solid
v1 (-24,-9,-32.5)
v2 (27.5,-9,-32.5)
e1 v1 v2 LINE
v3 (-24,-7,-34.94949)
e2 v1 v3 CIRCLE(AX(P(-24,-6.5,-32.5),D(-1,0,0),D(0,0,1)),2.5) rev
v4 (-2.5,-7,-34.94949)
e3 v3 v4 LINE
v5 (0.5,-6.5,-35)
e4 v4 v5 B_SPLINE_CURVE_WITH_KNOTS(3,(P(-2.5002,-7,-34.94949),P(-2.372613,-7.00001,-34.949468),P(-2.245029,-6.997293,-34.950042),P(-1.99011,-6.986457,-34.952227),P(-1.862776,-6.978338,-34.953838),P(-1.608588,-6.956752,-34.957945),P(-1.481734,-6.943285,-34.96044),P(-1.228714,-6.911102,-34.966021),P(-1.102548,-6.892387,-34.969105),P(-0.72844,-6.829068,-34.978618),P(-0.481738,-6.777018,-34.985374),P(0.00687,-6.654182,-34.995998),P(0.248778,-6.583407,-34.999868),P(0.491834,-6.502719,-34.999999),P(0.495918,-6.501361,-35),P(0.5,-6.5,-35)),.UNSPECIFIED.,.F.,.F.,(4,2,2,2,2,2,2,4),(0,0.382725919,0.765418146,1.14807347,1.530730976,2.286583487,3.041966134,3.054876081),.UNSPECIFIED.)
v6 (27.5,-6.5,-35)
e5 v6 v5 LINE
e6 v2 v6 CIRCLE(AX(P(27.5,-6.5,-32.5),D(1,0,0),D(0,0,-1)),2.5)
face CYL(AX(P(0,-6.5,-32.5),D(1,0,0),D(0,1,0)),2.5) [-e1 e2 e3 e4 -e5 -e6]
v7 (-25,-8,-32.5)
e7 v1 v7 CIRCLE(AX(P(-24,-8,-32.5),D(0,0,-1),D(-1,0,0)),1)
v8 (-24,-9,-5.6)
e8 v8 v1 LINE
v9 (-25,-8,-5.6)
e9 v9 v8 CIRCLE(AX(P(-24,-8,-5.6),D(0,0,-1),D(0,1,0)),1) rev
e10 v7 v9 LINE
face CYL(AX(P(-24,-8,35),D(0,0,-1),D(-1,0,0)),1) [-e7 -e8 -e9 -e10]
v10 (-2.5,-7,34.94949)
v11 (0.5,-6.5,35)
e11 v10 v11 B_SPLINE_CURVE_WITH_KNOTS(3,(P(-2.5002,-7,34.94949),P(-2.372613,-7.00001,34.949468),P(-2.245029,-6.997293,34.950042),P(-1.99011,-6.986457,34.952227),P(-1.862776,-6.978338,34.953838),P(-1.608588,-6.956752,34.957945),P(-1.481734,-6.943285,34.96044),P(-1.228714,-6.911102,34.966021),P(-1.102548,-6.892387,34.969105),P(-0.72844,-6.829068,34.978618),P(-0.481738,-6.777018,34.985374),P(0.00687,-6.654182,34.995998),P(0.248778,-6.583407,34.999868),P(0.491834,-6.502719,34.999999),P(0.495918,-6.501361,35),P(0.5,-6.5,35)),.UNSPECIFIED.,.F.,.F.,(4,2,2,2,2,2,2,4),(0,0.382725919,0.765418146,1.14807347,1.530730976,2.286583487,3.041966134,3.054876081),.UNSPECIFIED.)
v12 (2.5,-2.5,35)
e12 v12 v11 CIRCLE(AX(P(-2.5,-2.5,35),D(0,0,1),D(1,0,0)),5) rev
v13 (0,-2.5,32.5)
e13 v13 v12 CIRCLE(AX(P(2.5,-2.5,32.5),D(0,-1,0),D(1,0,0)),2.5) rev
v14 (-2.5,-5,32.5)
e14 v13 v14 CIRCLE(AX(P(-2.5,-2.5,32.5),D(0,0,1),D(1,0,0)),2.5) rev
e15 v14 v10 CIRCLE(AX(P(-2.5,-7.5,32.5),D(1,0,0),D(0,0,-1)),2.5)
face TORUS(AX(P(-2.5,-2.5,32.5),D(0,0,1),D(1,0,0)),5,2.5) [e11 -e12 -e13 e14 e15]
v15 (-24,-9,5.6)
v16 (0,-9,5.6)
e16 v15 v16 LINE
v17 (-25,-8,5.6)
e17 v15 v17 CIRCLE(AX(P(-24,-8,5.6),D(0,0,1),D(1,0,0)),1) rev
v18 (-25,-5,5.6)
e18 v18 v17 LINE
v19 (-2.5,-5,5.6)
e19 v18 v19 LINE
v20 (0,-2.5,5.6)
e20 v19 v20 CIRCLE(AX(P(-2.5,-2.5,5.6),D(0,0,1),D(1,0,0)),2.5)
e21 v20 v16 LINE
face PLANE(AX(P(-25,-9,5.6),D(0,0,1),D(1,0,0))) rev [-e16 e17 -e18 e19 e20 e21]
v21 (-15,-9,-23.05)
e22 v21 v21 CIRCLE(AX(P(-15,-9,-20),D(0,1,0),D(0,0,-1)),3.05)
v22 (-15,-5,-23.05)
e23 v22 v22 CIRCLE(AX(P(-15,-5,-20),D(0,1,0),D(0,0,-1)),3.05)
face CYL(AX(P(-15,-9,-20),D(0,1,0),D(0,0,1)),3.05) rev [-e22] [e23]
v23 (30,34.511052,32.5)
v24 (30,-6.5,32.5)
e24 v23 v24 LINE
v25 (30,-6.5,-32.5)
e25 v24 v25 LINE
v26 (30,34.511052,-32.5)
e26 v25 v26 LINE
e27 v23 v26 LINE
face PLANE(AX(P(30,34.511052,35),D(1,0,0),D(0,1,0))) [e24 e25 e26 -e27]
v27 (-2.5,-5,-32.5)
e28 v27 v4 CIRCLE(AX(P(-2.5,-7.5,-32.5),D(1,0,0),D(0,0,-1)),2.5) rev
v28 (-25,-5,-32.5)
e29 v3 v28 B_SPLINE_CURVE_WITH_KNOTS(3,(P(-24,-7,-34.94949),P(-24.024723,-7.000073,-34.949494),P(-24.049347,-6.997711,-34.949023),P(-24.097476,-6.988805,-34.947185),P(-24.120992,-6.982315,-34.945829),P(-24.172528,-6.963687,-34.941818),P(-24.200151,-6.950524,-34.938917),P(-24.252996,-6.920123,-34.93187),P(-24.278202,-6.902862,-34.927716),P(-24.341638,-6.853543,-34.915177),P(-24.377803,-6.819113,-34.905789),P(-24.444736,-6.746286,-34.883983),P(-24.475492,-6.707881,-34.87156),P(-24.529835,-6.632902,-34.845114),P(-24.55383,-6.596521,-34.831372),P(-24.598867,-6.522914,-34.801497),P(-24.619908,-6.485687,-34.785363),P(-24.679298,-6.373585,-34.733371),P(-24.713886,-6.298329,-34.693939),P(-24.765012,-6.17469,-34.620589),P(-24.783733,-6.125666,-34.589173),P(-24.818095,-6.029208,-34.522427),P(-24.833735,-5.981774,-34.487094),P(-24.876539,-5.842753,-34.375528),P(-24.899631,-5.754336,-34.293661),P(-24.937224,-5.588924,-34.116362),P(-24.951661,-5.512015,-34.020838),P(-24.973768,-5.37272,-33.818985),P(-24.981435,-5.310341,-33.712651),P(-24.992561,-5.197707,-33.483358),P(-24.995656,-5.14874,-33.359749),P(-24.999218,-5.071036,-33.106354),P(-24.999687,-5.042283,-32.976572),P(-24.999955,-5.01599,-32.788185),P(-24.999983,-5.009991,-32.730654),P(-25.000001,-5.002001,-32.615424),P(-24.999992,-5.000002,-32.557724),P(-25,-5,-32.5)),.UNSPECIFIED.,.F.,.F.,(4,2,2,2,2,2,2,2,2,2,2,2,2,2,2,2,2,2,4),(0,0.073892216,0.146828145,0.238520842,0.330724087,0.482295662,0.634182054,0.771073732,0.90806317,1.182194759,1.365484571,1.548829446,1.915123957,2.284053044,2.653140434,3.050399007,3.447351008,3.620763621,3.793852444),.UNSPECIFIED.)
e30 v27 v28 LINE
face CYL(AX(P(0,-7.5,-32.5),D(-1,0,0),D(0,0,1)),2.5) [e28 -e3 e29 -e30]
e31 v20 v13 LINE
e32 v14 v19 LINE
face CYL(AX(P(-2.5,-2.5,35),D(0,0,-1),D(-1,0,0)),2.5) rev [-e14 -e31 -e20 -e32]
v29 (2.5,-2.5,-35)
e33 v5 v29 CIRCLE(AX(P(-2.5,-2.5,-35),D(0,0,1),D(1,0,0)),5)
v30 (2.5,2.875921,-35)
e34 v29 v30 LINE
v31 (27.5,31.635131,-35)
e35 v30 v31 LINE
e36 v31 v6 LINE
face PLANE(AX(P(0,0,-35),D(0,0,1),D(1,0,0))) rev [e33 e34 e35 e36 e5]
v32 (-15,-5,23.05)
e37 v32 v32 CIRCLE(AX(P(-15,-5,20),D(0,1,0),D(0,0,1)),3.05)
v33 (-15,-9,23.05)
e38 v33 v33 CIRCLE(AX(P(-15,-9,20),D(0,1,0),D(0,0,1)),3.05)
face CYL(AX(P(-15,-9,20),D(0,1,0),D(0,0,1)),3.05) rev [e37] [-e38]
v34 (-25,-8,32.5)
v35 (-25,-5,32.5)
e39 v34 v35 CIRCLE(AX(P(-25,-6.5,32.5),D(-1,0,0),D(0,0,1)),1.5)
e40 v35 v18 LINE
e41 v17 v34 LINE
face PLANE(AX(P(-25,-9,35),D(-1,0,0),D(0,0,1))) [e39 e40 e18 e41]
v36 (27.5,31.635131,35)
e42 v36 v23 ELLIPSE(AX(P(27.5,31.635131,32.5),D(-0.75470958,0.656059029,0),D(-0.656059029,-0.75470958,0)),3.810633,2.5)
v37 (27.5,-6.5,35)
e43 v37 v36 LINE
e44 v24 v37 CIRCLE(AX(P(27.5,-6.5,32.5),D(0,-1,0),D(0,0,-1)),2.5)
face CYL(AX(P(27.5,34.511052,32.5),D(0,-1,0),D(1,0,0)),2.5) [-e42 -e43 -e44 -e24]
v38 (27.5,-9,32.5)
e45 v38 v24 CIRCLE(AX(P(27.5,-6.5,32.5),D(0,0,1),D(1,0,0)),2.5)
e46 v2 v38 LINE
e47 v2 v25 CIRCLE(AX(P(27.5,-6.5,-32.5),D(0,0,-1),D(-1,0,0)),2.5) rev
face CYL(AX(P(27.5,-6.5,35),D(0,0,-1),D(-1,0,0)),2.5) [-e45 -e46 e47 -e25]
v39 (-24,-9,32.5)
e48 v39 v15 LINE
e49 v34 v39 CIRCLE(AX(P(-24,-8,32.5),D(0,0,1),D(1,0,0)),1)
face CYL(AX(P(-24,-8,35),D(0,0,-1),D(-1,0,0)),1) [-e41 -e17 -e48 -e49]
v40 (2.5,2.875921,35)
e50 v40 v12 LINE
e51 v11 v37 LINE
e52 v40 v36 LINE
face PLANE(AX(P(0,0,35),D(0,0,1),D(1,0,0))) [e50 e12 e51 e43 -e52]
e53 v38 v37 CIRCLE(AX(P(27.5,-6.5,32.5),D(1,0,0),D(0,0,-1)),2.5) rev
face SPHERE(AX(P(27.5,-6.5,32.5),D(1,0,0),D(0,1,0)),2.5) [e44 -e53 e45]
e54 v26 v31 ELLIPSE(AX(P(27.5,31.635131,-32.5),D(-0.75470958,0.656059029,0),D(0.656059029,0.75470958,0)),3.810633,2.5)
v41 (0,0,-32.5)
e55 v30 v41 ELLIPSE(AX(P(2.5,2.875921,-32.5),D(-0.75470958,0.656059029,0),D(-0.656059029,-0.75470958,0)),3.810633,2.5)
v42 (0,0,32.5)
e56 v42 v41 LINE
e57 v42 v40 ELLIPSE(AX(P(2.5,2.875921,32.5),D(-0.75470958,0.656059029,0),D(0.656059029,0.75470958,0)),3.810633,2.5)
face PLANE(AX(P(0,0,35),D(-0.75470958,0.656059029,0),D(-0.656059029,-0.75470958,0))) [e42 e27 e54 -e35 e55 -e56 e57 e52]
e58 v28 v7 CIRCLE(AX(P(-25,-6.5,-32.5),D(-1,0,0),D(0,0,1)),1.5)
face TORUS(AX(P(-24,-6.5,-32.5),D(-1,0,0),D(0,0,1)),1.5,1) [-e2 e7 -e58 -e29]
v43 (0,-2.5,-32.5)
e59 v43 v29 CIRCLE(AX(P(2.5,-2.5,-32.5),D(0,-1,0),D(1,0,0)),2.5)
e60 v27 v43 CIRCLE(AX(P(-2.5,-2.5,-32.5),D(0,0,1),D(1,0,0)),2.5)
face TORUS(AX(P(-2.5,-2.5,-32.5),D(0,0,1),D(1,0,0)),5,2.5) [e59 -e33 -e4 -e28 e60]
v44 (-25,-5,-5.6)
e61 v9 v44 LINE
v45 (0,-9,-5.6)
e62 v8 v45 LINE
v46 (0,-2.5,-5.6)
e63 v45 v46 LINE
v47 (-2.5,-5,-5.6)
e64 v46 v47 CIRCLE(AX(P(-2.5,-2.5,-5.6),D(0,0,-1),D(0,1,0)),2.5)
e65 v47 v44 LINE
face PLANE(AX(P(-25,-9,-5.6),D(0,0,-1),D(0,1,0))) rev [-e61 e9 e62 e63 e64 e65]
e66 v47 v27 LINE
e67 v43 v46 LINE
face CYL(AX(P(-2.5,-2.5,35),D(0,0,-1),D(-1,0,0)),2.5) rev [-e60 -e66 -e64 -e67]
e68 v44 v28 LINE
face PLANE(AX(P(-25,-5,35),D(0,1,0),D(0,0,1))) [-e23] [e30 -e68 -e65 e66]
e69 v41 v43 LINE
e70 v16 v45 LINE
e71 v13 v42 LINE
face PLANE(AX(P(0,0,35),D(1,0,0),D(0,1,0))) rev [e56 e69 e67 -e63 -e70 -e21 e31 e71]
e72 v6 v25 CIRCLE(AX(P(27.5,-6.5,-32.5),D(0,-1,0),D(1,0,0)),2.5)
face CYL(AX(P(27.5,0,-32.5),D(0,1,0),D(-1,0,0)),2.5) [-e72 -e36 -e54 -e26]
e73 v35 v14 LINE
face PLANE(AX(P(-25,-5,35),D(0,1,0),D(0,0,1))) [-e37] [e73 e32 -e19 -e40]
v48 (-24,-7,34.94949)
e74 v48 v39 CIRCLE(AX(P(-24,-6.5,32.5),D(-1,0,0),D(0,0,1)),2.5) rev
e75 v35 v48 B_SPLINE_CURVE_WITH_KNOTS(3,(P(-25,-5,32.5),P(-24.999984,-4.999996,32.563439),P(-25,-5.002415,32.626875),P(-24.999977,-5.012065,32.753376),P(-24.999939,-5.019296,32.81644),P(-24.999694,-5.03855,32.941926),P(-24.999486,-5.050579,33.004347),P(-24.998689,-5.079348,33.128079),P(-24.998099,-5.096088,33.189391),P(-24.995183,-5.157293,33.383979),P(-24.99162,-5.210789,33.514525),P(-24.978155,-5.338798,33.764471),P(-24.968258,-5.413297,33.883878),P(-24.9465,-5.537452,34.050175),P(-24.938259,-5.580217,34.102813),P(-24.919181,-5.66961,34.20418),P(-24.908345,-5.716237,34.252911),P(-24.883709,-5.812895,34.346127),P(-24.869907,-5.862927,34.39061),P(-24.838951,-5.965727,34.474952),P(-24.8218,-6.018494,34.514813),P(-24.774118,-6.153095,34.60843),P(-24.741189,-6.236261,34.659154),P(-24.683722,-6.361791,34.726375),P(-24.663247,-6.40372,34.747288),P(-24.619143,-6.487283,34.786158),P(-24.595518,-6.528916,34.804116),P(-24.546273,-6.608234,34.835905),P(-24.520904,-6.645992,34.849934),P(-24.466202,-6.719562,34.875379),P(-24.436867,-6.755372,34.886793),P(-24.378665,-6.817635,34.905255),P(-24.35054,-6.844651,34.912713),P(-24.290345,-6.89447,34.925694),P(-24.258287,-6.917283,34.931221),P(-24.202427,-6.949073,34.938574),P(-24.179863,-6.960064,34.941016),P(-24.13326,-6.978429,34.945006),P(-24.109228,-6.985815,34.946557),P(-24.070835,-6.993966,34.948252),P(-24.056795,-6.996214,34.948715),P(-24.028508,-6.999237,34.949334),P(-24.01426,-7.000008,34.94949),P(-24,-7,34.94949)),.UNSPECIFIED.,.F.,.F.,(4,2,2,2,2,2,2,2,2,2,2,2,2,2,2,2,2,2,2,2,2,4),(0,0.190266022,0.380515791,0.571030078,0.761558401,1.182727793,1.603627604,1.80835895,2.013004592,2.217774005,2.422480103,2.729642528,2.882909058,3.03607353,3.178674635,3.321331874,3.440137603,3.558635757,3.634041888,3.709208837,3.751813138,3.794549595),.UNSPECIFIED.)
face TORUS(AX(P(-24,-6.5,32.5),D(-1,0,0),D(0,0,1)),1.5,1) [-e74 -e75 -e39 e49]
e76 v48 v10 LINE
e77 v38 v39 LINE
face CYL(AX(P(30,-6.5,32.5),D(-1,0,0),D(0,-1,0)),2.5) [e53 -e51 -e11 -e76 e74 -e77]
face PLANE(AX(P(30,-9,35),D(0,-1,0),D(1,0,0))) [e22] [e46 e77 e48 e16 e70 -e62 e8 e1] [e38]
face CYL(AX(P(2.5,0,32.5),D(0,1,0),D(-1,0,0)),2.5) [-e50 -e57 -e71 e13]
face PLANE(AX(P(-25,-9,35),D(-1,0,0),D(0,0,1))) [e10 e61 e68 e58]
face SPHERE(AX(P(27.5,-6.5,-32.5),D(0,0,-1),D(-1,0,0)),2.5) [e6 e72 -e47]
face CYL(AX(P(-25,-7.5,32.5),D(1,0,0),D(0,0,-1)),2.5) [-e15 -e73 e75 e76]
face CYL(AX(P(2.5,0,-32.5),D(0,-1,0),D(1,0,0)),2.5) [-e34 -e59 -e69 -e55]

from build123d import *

# Parameters (mm, degrees)
BOSS_EXTRUDE1_DEPTH = 35
SKETCH3_W           = 11.2
SKETCH3_H           = 6
CUT_EXTRUDE1_DEPTH  = 58.584830686
SKETCH4_R           = 3.05
CUT_EXTRUDE2_DEPTH  = 61.713451947
FILLET1_R           = 2.5
FILLET4_R           = 1


# Some blends are built 0.0001 mm under size
with BuildPart() as part:
    # Sketch2 → Boss-Extrude1 (new, symmetric)
    with BuildSketch(Plane.XY):
        Polygon((0, 0), (30, 34.511052217), (30, -9), (-25, -9), (-25, -5), (0, -5), align=None)
    extrude(amount=BOSS_EXTRUDE1_DEPTH, both=True)

    # Sketch3 → Cut-Extrude1 (cut, through all)
    with BuildSketch(Plane(origin=(0, 0, 0), x_dir=(0, 0, -1), z_dir=(1, 0, 0))):
        with Locations((0, -6)):
            Rectangle(SKETCH3_W, SKETCH3_H)
    extrude(amount=-CUT_EXTRUDE1_DEPTH, mode=Mode.SUBTRACT)

    # Sketch4 → Cut-Extrude2 (cut, through all)
    with BuildSketch(Plane(origin=(0, -5, 0), x_dir=(1, 0, 0), z_dir=(0, 1, 0))):
        with Locations(Location((-15, -20, 0), (0, 0, 270))):
            Circle(SKETCH4_R)
        with Locations(Location((-15, 20, 0), (0, 0, 90))):
            Circle(SKETCH4_R)
    extrude(amount=-CUT_EXTRUDE2_DEPTH, mode=Mode.SUBTRACT)

    # Fillet1
    # the kernel refuses this fillet: 2.5 mm, written as the material it adds along each edge
    with BuildSketch(Plane(origin=(0, -5, -35), x_dir=(0, 1, 0), z_dir=(0, 0, 1)), Plane(origin=(0, -5, 5.6), x_dir=(0, 1, 0), z_dir=(0, 0, 1))) as fillet1_piece_1:
        with BuildLine():
            CenterArc((FILLET1_R, FILLET1_R), FILLET1_R, 180, 90)
            Line((0, FILLET1_R), (0, 0))
            Line((0, 0), (FILLET1_R, 0))
        make_face()
    extrude(amount=29.4)
    # the kernel refuses this fillet: 2.5 mm, written as the material it takes off along each edge
    with BuildSketch(Plane(origin=(27.5, -6.5, 32.5), x_dir=(1, 0, 0), z_dir=(0, 0, 1))) as fillet1_2_piece_1_section:
        Polygon((0, 0), (FILLET1_R, 0), (FILLET1_R, -FILLET1_R), (0, -FILLET1_R), align=None)
    fillet1_2_piece_1 = extrude(amount=FILLET1_R, mode=Mode.PRIVATE)
    fillet1_2_piece_1 = fillet1_2_piece_1 - Plane(origin=(27.5, -6.5, 32.5), x_dir=(-0.7071067811865476, 0.7071067811865474, 0), z_dir=(0, 0, 1)) * Sphere(FILLET1_R, mode=Mode.PRIVATE)
    add(fillet1_2_piece_1, mode=Mode.SUBTRACT)
    with BuildSketch(Plane(origin=(27.5, -6.5, -32.5), x_dir=(0, 0, -1), z_dir=(1, 0, 0))) as fillet1_2_piece_2_section:
        Polygon((0, 0), (FILLET1_R, 0), (FILLET1_R, -FILLET1_R), (0, -FILLET1_R), align=None)
    fillet1_2_piece_2 = extrude(amount=FILLET1_R, mode=Mode.PRIVATE)
    fillet1_2_piece_2 = fillet1_2_piece_2 - Plane(origin=(27.5, -6.5, -32.5), x_dir=(0, 0.7071067811865475, 0.7071067811865475), z_dir=(1, 0, 0)) * Sphere(FILLET1_R, mode=Mode.PRIVATE)
    add(fillet1_2_piece_2, mode=Mode.SUBTRACT)
    with BuildSketch(Plane(origin=(30, -9, 32.5), x_dir=(-1, 0, 0), z_dir=(0, 0, -1))) as fillet1_2_piece_3:
        with BuildLine():
            CenterArc((FILLET1_R, FILLET1_R), FILLET1_R, 180, 90)
            Line((0, FILLET1_R), (0, 0))
            Line((0, 0), (FILLET1_R, 0))
        make_face()
    extrude(amount=65, mode=Mode.SUBTRACT)
    with BuildSketch(Plane(origin=(30, 40.761052217, -35), x_dir=(0, 0, 1), z_dir=(0, -1, 0)), Plane(origin=(30, 40.761052217, 35), x_dir=(-1, 0, 0), z_dir=(0, -1, 0))) as fillet1_2_piece_4:
        with BuildLine():
            CenterArc((FILLET1_R, FILLET1_R), FILLET1_R, 180, 90)
            Line((0, FILLET1_R), (0, 0))
            Line((0, 0), (FILLET1_R, 0))
        make_face()
    extrude(amount=47.261052217, mode=Mode.SUBTRACT)
    with BuildSketch(Plane(origin=(27.5, -9, 35), x_dir=(0, 1, 0), z_dir=(-1, 0, 0)), Plane(origin=(27.5, -9, -35), x_dir=(0, 0, 1), z_dir=(-1, 0, 0))) as fillet1_2_piece_5:
        with BuildLine():
            CenterArc((FILLET1_R, FILLET1_R), FILLET1_R, 180, 90)
            Line((0, FILLET1_R), (0, 0))
            Line((0, 0), (FILLET1_R, 0))
        make_face()
    extrude(amount=58.75, mode=Mode.SUBTRACT)
    # the kernel refuses this fillet: 2.5 mm, written as the material it takes off along each edge
    with BuildSketch(Plane(origin=(0, -2.5, 35), x_dir=(0, 0, -1), z_dir=(0, 1, 0))) as fillet1_3_piece_1:
        with BuildLine():
            CenterArc((FILLET1_R, -FILLET1_R), FILLET1_R, 90, 90)
            Line((0, -FILLET1_R), (0, 0))
            Line((0, 0), (FILLET1_R, 0))
        make_face()
    extrude(amount=8.75, mode=Mode.SUBTRACT)
    with BuildSketch(Plane(origin=(0, -2.5, -35), x_dir=(0, 0, 1), z_dir=(0, 1, 0))) as fillet1_3_piece_2:
        with BuildLine():
            CenterArc((FILLET1_R, FILLET1_R), FILLET1_R, 180, 90)
            Line((0, FILLET1_R), (0, 0))
            Line((0, 0), (FILLET1_R, 0))
        make_face()
    extrude(amount=8.75, mode=Mode.SUBTRACT)
    with BuildSketch(Plane(origin=(-31.25, -5, 35), x_dir=(0, -1, 0), z_dir=(1, 0, 0))) as fillet1_3_piece_3:
        with BuildLine():
            CenterArc((FILLET1_R, FILLET1_R), FILLET1_R, 180, 90)
            Line((0, FILLET1_R), (0, 0))
            Line((0, 0), (FILLET1_R, 0))
        make_face()
    extrude(amount=28.75, mode=Mode.SUBTRACT)
    with BuildSketch(Plane(origin=(-31.25, -5, -35), x_dir=(0, -1, 0), z_dir=(1, 0, 0))) as fillet1_3_piece_4:
        with BuildLine():
            CenterArc((FILLET1_R, -FILLET1_R), FILLET1_R, 90, 90)
            Line((0, -FILLET1_R), (0, 0))
            Line((0, 0), (FILLET1_R, 0))
        make_face()
    extrude(amount=28.75, mode=Mode.SUBTRACT)
    with BuildSketch(Plane(origin=(-2.5, -2.5, -35), x_dir=(1, 0, 0), z_dir=(0, 1, 0))) as fillet1_3_piece_5:
        with BuildLine():
            CenterArc((2.5 + FILLET1_R, -FILLET1_R), FILLET1_R, 90, 90)
            Line((2.5, -FILLET1_R), (2.5, 0))
            Line((2.5, 0), (2.5 + FILLET1_R, 0))
        make_face()
    revolve(axis=Axis((-2.5, -2.5, -35), (0, 0, -1)), revolution_arc=90, mode=Mode.SUBTRACT)
    with BuildSketch(Plane(origin=(-2.5, -2.5, 35), x_dir=(1, 0, 0), z_dir=(0, 1, 0))) as fillet1_3_piece_6:
        with BuildLine():
            CenterArc((2.5 + FILLET1_R, FILLET1_R), FILLET1_R, 180, 90)
            Line((2.5, FILLET1_R), (2.5, 0))
            Line((2.5, 0), (2.5 + FILLET1_R, 0))
        make_face()
    revolve(axis=Axis((-2.5, -2.5, 35), (0, 0, -1)), revolution_arc=90, mode=Mode.SUBTRACT)

    # Fillet4
    fillet4_edges = [part.edges().sort_by_distance(p)[0] for p in [
        (-25, -8.436491673, -34.08113883),
        (-25, -8.436491673, 34.08113883),
        (-25, -9, -19.05),
        (-25, -9, 19.05),
    ]]
    fillet(fillet4_edges, radius=FILLET4_R - 0.0001)  # a hair under: the kernel refuses the full size


solid = part.part
